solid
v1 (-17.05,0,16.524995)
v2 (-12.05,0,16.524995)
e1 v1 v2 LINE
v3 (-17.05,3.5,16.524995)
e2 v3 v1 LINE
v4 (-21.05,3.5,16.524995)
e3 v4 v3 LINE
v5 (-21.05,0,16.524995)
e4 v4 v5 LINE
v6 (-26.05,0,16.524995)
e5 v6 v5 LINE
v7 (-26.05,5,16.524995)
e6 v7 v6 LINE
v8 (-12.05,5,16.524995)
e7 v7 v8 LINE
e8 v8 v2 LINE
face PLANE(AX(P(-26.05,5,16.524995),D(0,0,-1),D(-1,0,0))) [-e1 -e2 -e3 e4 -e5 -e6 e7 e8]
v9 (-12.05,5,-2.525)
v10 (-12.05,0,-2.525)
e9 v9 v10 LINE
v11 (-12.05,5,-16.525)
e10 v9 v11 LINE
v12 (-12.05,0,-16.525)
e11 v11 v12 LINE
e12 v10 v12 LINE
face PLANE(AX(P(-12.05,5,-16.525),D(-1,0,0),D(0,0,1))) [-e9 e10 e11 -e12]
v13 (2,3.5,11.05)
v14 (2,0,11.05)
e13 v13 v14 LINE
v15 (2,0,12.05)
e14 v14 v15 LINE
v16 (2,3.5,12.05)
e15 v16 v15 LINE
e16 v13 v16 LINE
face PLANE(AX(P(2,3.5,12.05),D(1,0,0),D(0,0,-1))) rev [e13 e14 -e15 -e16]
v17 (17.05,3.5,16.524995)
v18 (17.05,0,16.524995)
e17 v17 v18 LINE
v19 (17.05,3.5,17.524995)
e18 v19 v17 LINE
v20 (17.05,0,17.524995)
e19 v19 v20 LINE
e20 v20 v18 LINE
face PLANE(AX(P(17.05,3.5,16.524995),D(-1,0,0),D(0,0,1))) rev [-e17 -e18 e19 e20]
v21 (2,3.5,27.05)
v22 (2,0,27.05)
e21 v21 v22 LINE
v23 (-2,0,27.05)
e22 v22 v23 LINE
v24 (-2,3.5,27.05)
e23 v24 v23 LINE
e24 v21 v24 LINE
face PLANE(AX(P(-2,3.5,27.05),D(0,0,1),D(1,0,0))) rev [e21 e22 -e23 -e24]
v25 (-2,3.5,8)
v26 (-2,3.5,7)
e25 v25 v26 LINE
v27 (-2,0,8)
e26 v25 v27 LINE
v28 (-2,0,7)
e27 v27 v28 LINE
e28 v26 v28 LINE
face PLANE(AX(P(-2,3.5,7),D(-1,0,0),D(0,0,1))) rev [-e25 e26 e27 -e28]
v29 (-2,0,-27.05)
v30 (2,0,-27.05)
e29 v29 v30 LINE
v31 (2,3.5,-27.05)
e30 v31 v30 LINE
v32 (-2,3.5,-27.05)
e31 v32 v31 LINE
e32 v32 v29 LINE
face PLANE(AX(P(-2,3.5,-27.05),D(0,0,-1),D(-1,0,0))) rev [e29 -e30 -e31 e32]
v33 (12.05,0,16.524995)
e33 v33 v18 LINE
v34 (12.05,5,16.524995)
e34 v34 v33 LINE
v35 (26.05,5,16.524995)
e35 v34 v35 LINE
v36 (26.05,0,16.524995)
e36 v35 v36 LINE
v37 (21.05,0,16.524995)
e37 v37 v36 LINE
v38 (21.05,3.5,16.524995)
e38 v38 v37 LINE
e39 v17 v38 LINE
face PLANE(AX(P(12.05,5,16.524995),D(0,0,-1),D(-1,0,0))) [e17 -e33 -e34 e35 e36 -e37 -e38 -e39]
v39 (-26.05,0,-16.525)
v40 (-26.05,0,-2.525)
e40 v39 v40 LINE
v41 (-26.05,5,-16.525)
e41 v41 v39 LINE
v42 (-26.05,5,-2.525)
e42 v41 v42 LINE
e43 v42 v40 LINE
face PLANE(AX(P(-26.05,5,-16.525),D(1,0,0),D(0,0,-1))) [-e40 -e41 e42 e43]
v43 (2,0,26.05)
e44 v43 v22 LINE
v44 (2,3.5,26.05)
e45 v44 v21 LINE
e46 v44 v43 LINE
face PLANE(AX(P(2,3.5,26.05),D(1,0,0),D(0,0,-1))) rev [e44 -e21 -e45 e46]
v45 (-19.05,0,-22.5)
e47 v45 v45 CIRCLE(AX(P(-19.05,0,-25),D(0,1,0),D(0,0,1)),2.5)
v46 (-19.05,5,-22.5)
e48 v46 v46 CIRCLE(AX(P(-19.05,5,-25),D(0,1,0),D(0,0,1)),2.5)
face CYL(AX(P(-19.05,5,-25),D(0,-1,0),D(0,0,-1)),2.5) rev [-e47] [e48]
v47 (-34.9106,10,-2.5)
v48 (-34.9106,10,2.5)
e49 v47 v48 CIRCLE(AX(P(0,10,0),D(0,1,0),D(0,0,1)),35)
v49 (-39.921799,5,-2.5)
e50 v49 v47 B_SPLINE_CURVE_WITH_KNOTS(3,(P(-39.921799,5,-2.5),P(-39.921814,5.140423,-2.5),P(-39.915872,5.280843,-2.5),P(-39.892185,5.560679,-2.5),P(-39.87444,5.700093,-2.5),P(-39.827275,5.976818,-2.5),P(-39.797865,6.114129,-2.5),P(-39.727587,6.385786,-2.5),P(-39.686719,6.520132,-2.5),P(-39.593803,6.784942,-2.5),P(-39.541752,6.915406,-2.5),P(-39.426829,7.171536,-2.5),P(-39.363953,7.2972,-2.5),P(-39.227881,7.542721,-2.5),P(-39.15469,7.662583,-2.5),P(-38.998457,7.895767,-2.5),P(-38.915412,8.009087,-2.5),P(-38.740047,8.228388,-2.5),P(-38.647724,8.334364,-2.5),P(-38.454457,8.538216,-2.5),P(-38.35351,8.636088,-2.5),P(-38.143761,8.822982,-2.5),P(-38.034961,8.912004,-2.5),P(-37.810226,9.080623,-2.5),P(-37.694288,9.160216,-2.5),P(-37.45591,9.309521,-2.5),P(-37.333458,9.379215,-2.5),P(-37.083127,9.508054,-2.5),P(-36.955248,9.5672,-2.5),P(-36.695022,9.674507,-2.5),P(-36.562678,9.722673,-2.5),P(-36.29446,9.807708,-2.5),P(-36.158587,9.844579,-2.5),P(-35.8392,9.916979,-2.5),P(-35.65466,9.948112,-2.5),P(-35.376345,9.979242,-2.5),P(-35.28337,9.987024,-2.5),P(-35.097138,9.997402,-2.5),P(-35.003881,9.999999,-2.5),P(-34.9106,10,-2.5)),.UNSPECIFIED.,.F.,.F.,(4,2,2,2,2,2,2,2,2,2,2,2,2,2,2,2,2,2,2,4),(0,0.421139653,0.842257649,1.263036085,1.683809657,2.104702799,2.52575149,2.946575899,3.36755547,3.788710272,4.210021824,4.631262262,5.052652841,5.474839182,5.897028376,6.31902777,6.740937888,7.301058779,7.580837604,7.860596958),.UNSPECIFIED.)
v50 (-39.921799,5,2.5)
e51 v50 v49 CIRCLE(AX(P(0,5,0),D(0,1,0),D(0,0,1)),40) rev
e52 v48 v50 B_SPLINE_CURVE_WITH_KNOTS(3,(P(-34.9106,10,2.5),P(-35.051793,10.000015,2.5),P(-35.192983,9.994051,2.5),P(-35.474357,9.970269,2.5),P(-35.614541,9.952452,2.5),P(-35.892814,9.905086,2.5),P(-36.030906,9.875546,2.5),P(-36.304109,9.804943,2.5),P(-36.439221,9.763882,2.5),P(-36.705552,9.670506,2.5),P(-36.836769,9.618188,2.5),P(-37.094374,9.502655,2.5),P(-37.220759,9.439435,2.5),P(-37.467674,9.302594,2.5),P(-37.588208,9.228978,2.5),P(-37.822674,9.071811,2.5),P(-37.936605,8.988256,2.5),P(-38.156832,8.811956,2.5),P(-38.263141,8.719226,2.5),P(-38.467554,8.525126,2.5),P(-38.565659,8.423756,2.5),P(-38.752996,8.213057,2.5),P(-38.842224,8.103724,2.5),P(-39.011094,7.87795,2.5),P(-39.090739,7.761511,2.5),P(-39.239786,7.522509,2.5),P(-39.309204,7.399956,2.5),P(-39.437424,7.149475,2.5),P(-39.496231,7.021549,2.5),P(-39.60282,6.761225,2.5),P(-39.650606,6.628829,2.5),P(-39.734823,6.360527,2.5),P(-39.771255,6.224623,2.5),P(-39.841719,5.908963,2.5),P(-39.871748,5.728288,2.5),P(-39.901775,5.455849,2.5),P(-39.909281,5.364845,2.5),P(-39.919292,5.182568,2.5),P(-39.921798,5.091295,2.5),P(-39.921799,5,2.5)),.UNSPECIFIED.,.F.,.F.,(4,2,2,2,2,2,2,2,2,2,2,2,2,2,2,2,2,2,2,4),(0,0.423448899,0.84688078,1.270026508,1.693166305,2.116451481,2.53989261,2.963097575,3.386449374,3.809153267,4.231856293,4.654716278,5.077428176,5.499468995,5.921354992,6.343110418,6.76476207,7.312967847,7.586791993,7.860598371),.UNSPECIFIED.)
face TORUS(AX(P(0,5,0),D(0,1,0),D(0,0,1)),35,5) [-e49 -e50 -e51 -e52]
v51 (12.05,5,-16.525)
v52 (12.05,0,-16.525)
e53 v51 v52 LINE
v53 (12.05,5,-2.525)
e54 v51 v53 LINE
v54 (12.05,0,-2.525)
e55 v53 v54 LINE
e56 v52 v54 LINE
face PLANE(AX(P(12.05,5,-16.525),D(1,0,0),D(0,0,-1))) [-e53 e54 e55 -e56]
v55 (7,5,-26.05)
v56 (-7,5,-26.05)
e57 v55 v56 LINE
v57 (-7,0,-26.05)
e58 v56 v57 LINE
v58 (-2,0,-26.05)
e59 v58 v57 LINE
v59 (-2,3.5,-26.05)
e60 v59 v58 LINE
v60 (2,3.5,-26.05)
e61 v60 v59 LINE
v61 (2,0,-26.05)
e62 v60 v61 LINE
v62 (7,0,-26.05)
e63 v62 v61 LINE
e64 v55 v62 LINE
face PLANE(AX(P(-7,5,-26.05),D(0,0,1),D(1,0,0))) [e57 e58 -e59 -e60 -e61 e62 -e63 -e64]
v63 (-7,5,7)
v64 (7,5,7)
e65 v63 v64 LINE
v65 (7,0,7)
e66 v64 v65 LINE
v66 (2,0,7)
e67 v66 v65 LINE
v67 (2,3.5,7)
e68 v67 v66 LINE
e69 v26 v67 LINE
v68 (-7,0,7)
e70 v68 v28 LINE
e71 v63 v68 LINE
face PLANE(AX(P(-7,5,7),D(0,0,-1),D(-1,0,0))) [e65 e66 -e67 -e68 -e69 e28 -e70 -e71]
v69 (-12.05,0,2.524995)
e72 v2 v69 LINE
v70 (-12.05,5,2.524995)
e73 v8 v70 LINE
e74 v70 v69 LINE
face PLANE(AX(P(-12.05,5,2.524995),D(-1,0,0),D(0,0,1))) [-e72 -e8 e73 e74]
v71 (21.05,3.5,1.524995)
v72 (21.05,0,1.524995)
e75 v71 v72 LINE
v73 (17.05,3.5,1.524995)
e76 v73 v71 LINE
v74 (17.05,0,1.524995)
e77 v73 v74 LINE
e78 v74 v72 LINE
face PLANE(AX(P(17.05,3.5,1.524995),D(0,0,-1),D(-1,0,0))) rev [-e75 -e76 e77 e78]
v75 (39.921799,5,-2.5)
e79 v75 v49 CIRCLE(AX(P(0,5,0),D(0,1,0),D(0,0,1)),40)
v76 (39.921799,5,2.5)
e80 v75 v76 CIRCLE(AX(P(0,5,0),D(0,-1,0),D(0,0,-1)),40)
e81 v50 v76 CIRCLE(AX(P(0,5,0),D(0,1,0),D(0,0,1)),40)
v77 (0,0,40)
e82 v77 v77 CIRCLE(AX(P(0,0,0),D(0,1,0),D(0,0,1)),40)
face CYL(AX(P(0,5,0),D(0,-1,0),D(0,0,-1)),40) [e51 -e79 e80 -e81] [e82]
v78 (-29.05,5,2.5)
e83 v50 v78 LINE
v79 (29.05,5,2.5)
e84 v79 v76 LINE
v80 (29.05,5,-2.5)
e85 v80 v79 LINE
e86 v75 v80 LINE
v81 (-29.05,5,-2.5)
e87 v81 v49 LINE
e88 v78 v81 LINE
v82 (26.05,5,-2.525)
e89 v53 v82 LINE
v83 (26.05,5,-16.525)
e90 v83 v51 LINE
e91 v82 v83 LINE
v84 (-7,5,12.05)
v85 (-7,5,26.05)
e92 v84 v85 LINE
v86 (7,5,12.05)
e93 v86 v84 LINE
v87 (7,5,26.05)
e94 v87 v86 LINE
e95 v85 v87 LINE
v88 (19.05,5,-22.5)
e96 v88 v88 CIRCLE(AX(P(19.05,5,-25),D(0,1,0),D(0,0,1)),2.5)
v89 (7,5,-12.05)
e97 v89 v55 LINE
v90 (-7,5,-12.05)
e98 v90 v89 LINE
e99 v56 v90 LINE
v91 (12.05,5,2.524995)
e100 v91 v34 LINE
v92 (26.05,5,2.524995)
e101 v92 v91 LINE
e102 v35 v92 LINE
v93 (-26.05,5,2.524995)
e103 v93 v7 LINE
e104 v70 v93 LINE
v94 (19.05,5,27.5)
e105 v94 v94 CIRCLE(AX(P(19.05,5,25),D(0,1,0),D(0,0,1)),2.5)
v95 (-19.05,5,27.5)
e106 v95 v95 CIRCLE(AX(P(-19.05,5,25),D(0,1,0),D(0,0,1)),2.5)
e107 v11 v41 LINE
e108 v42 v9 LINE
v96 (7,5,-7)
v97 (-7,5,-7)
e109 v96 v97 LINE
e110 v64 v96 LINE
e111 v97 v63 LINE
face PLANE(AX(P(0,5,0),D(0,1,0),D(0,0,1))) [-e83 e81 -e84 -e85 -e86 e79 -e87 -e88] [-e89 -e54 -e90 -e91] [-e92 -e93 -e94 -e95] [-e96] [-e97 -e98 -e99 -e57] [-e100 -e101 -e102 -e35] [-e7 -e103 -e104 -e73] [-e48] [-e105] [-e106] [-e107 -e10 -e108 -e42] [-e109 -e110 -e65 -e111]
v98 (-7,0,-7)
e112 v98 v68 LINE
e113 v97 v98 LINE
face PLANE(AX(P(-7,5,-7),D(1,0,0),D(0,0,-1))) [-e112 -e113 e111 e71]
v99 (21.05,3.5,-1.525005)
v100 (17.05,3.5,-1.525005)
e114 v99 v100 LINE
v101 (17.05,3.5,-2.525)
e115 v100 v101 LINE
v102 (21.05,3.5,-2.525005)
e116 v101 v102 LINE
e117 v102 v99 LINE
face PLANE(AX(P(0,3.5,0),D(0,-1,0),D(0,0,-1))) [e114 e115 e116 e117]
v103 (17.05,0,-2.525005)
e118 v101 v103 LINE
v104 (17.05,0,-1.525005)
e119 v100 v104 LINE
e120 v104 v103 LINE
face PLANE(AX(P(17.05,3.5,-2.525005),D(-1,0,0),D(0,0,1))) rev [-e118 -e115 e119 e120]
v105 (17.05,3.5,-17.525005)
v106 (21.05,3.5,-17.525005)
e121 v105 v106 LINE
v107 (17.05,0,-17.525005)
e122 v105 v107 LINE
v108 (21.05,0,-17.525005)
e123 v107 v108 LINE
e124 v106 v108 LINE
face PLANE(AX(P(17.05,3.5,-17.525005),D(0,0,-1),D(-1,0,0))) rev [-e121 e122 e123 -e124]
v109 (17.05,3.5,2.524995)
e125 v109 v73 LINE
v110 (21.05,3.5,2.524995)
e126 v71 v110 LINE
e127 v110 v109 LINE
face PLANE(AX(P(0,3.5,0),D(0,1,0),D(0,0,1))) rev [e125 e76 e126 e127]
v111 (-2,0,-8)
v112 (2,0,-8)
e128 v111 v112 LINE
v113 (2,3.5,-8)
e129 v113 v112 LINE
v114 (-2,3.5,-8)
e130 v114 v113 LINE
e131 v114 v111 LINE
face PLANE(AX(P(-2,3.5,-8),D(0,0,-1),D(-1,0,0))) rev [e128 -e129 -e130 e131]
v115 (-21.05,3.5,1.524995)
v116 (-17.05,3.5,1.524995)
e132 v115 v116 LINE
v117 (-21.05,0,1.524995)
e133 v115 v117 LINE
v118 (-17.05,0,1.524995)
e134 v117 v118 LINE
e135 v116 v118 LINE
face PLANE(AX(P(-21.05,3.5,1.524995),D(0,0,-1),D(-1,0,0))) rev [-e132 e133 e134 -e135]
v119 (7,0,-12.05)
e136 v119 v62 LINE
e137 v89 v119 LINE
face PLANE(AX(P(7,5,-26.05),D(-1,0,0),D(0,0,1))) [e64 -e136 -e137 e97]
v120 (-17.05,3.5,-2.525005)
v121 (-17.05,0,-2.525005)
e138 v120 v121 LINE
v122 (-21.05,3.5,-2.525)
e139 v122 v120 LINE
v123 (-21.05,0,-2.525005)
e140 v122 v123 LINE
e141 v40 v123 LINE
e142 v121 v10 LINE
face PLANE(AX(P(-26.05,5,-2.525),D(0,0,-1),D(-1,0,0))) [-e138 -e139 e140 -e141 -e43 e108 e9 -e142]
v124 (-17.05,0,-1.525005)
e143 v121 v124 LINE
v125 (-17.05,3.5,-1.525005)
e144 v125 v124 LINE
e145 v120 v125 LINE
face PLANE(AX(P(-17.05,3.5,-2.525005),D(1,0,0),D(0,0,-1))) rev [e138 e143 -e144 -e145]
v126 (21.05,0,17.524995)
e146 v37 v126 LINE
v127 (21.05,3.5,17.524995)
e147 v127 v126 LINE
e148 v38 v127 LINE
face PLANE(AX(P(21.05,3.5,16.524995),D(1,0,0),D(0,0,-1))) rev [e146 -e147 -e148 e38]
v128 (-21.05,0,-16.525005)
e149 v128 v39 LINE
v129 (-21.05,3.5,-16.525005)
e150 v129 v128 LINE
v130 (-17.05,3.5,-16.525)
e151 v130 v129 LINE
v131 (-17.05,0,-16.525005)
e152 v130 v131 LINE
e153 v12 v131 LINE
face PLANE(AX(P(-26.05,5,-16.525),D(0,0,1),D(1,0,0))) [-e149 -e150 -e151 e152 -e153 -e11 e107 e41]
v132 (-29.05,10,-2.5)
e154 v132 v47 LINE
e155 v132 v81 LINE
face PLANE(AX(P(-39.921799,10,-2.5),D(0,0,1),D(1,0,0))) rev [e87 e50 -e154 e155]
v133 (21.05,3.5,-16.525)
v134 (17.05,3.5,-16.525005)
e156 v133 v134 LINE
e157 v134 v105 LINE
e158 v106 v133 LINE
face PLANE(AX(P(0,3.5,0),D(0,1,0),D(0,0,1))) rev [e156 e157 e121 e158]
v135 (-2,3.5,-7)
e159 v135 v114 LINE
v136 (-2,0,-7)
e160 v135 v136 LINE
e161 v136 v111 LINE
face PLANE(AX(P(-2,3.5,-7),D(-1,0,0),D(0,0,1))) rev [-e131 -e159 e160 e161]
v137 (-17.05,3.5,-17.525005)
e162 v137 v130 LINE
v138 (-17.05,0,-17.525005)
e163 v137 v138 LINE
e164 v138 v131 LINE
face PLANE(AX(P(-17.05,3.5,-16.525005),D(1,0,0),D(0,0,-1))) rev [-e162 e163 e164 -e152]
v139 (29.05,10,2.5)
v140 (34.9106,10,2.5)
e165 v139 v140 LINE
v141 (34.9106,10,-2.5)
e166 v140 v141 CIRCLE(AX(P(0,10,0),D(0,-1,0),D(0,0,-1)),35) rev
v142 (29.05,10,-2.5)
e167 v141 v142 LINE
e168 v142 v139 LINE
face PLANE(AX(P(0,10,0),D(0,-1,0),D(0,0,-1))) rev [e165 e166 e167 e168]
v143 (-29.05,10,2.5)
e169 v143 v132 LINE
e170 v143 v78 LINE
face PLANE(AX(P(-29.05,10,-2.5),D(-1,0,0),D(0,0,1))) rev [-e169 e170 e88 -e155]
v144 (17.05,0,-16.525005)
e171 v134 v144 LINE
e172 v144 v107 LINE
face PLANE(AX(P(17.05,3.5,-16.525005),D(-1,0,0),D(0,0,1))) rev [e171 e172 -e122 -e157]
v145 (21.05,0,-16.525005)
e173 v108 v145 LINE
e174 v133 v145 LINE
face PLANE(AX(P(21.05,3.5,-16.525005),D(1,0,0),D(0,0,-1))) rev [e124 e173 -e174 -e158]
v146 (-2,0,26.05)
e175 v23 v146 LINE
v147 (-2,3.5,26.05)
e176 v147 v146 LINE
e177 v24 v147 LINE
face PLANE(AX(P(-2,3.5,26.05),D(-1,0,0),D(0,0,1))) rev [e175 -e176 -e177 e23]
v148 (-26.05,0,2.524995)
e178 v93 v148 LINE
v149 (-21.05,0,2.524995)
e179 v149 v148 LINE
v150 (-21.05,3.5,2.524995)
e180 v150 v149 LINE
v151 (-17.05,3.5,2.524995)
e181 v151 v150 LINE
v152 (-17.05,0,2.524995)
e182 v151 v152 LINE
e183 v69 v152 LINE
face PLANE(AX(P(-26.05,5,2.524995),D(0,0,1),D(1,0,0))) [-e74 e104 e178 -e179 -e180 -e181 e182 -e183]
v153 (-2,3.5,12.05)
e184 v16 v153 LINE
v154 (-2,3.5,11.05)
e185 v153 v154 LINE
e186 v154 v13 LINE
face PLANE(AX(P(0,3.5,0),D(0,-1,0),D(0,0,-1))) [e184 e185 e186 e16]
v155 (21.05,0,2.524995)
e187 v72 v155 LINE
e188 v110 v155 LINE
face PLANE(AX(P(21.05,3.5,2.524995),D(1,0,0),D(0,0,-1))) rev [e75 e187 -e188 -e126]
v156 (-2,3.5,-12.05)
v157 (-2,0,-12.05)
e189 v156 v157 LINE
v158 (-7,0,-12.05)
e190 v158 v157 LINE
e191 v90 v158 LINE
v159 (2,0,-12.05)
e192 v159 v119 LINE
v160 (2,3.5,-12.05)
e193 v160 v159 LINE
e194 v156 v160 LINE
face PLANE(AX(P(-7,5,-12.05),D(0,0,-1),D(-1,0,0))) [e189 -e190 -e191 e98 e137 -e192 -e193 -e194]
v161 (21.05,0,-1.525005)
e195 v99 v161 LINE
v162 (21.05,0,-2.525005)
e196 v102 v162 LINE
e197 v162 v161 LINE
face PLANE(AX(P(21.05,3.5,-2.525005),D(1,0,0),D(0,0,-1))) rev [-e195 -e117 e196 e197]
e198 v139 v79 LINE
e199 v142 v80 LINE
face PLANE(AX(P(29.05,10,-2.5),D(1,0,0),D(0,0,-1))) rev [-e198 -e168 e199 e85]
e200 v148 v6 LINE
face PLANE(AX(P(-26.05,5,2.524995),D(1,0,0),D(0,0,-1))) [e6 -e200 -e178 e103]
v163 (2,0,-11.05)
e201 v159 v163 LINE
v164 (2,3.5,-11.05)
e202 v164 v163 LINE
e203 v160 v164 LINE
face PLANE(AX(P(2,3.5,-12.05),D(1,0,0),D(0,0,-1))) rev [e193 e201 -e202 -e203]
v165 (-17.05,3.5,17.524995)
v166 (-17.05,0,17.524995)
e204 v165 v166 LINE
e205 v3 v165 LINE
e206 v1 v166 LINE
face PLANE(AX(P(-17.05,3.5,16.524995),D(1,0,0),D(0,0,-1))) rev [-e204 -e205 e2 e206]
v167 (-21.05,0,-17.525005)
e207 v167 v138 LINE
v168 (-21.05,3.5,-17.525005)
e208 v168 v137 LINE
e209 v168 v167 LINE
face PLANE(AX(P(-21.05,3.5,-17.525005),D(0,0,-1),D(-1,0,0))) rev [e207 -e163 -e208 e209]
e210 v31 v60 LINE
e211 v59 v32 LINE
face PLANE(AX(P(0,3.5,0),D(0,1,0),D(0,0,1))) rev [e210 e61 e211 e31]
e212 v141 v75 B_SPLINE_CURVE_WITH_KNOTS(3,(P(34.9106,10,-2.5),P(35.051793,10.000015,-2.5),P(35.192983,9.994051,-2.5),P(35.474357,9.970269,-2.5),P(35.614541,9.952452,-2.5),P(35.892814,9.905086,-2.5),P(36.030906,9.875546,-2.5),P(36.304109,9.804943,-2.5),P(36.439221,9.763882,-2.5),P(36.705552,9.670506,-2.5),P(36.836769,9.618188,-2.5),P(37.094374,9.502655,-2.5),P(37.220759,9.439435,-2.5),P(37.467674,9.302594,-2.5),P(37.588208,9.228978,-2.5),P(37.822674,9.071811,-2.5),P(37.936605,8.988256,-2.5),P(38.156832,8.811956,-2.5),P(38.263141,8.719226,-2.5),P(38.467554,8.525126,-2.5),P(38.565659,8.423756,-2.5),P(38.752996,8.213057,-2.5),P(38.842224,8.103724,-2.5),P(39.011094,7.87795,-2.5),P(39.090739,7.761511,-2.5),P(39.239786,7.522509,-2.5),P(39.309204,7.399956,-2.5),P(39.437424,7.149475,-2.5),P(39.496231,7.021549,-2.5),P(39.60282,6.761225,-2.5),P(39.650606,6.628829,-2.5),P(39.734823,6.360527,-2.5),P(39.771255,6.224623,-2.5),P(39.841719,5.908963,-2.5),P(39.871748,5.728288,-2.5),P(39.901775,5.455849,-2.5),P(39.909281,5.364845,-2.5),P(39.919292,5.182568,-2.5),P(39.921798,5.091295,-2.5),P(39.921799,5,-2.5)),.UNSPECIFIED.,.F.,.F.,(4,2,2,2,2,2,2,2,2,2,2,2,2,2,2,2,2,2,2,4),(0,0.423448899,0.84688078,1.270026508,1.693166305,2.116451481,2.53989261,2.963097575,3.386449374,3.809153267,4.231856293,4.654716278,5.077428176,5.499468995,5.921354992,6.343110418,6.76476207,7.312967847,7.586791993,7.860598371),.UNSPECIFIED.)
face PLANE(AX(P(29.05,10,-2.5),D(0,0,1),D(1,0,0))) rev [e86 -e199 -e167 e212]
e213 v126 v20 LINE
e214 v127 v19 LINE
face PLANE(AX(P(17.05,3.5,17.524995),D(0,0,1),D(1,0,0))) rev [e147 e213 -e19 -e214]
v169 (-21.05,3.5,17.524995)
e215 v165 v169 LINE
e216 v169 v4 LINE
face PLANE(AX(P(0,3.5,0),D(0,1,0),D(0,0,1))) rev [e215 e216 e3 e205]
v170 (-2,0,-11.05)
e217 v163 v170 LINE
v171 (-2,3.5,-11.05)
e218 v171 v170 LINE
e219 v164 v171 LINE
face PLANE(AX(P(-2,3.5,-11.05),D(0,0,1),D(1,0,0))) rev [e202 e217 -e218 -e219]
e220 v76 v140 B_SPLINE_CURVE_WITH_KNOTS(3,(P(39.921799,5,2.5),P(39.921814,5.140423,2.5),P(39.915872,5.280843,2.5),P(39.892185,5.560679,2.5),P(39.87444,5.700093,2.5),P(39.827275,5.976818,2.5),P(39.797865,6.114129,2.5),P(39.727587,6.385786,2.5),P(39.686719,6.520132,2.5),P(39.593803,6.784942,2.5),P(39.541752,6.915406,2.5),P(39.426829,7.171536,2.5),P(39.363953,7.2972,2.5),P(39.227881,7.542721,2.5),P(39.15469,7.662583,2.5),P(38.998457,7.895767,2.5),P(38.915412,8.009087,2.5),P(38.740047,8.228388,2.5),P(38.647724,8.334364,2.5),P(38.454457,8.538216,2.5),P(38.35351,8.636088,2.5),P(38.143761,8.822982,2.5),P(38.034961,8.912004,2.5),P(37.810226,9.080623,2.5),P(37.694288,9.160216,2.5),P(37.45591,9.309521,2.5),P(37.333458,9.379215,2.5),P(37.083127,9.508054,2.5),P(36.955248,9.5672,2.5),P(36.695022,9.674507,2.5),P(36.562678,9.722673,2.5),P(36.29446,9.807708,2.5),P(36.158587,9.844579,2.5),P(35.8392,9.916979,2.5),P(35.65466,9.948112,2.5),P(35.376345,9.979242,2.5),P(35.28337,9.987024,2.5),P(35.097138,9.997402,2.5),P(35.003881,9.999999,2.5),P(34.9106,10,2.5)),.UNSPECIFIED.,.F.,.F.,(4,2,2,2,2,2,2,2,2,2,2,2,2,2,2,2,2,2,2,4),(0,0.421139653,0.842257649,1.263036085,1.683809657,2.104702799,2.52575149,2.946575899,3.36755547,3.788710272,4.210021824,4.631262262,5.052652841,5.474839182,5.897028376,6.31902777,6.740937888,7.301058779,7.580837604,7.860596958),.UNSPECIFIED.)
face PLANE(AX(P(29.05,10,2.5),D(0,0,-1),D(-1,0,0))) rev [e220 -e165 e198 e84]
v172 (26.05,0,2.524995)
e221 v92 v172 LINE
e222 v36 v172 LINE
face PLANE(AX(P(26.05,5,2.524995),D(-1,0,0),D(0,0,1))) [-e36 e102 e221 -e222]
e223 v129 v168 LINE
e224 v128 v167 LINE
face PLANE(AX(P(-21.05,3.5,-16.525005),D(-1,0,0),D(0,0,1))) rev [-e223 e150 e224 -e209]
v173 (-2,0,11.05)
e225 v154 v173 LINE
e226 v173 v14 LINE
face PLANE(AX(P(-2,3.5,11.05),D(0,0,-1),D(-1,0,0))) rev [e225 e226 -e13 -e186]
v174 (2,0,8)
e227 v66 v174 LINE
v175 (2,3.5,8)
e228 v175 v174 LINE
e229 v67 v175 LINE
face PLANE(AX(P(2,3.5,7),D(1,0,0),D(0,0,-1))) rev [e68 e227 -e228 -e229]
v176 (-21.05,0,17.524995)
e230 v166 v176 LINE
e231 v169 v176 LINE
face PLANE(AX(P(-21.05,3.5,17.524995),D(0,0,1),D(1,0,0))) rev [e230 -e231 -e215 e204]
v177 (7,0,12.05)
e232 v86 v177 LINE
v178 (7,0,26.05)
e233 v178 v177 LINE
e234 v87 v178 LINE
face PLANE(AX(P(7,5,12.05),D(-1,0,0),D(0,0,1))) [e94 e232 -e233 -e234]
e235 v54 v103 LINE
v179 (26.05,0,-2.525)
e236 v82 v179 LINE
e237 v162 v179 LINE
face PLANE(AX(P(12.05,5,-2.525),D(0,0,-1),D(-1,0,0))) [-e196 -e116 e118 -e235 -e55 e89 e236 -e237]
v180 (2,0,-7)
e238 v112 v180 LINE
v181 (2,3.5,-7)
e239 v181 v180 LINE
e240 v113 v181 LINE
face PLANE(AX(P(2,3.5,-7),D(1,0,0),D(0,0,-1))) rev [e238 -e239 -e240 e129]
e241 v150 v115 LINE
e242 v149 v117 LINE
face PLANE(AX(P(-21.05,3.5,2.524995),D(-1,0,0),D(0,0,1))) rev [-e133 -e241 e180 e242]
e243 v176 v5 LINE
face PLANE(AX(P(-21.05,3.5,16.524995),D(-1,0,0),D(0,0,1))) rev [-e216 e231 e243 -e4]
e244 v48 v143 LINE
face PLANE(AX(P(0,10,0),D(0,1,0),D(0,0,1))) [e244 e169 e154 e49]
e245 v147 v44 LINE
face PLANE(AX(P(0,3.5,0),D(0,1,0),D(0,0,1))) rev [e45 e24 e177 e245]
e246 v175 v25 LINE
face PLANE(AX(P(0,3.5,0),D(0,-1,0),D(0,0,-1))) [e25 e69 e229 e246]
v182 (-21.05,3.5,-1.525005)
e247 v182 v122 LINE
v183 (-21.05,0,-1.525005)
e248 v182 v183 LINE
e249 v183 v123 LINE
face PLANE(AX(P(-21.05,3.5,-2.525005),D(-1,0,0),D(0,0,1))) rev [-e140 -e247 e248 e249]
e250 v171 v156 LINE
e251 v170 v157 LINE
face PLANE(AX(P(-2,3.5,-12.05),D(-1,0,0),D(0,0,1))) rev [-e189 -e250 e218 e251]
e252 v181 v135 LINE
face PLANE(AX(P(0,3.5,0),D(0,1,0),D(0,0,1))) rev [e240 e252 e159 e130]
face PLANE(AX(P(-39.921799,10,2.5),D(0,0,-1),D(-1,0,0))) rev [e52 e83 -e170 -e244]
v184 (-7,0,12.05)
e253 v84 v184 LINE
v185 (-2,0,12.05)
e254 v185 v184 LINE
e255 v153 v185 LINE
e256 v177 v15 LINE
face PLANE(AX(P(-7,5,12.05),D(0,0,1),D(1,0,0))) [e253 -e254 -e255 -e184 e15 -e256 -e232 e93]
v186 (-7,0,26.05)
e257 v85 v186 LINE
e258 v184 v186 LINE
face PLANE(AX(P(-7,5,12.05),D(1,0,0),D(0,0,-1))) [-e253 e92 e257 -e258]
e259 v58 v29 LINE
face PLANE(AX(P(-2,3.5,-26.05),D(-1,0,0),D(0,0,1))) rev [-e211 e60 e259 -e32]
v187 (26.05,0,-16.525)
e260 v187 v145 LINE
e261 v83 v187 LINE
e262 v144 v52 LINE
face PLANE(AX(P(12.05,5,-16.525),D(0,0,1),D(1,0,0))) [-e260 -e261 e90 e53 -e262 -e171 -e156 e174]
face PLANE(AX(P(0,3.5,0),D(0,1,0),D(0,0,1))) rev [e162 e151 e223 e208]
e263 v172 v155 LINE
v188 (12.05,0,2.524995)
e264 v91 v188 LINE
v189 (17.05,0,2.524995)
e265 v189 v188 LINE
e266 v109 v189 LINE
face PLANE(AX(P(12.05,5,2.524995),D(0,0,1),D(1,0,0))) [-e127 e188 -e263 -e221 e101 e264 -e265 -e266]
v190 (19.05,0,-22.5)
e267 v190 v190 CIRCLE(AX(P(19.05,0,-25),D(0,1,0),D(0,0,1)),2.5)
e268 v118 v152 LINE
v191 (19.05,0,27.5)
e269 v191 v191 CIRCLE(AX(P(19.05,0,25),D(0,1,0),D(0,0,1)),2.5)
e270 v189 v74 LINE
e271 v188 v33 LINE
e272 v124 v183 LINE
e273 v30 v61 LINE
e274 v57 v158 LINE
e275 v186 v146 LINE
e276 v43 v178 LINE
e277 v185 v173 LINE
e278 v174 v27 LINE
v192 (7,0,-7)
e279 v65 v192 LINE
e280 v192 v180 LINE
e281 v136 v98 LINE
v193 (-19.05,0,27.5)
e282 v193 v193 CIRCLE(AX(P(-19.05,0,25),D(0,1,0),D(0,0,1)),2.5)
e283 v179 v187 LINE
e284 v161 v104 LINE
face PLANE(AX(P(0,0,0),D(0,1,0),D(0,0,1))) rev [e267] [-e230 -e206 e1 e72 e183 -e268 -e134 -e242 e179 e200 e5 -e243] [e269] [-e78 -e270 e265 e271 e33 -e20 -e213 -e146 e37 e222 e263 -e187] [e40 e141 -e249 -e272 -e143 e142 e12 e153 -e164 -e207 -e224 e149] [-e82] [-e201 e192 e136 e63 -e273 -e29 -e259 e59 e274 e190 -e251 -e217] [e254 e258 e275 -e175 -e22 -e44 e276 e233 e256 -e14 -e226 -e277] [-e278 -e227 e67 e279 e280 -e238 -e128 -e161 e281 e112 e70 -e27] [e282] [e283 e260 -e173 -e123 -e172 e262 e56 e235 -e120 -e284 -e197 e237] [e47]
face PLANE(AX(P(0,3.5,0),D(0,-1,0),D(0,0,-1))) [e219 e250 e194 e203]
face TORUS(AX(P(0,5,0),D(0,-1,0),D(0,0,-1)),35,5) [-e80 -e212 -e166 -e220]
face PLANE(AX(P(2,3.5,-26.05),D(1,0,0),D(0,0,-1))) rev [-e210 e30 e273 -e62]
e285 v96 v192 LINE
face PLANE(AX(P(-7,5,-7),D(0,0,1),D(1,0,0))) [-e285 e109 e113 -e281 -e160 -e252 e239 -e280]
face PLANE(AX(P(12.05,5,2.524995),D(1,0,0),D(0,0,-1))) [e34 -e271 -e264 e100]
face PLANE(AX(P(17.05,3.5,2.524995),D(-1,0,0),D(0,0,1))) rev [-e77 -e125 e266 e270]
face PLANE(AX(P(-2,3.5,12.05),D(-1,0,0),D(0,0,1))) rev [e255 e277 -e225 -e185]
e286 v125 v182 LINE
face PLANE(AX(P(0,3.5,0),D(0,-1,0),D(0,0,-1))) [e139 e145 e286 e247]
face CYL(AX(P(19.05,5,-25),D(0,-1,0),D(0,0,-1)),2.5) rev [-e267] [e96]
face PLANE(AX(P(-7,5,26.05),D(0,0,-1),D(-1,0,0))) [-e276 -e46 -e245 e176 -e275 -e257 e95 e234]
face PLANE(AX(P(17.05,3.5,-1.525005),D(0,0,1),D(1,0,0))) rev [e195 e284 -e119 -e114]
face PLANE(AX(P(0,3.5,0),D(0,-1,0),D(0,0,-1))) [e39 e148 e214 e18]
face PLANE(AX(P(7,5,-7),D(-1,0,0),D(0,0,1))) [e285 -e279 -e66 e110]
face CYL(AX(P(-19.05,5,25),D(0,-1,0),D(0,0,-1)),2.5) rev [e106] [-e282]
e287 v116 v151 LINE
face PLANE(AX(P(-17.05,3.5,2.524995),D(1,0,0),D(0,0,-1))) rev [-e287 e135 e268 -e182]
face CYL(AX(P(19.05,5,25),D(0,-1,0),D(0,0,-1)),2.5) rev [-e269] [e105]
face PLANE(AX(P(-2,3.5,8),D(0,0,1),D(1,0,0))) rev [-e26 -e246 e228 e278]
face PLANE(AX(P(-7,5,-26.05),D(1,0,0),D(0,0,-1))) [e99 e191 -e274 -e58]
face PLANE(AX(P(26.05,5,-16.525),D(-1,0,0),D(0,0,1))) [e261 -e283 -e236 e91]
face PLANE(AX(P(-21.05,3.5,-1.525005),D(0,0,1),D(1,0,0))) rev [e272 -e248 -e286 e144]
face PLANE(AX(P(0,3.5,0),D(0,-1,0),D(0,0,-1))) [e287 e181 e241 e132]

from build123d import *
from OCP.BRepAlgoAPI import BRepAlgoAPI_Cut
from OCP.TopTools import TopTools_ListOfShape

# Parameters (mm, degrees)
SKETCH1_R           = 40
SKETCH1_R_2         = 2.5
SKETCH1_W           = 14
SKETCH1_H           = 14
BOSS_EXTRUDE1_DEPTH = 5
BOSS_EXTRUDE2_DEPTH = 5
FILLET1_R           = 5
SKETCH3_W           = 4
SKETCH3_H           = 1
CUT_EXTRUDE1_DEPTH  = 3.5


with BuildPart() as part:
    # Sketch1 → Boss-Extrude1 (new body)
    with BuildSketch(Plane(origin=(0, 0, 0), x_dir=(1, 0, 0), z_dir=(0, 1, 0))):
        with Locations(Location((0, 0, 0), (0, 0, 270))):
            Circle(SKETCH1_R)
        with Locations(Location((-19.05, 25, 0), (0, 0, 270))):
            Circle(SKETCH1_R_2, mode=Mode.SUBTRACT)
        with Locations(Location((19.05, 25, 0), (0, 0, 270))):
            Circle(SKETCH1_R_2, mode=Mode.SUBTRACT)
        with Locations(Location((19.05, -25, 0), (0, 0, 270))):
            Circle(SKETCH1_R_2, mode=Mode.SUBTRACT)
        with Locations(Location((-19.05, -25, 0), (0, 0, 270))):
            Circle(SKETCH1_R_2, mode=Mode.SUBTRACT)
        with Locations((0, 19.05)):
            Rectangle(SKETCH1_W, SKETCH1_H, mode=Mode.SUBTRACT)
        Rectangle(SKETCH1_W, SKETCH1_H, mode=Mode.SUBTRACT)
        with Locations((0, -19.05)):
            Rectangle(SKETCH1_W, SKETCH1_H, mode=Mode.SUBTRACT)
        with Locations((-19.05, 9.525)):
            Rectangle(SKETCH1_W, SKETCH1_H, mode=Mode.SUBTRACT)
        with Locations((19.05, 9.525)):
            Rectangle(SKETCH1_W, SKETCH1_H, mode=Mode.SUBTRACT)
        with Locations((-19.04999963, -9.524995038)):
            Rectangle(SKETCH1_W, SKETCH1_H, mode=Mode.SUBTRACT)
        with Locations((19.05000037, -9.524995038)):
            Rectangle(SKETCH1_W, SKETCH1_H, mode=Mode.SUBTRACT)
    extrude(amount=BOSS_EXTRUDE1_DEPTH)

    # Sketch2 → Boss-Extrude2 (add)
    with BuildSketch(Plane(origin=(0, 5, 0), x_dir=(1, 0, 0), z_dir=(0, 1, 0))):
        with BuildLine():
            Line((-39.921798557, 2.5), (-29.05, 2.5))
            Line((-29.05, 2.5), (-29.05, -2.5))
            Line((-29.05, -2.5), (-39.921798557, -2.5))
            ThreePointArc((-39.921798557, -2.5), (-40, 0), (-39.921798557, 2.5))
        make_face()
        with BuildLine():
            Line((29.05, 2.5), (29.05, -2.5))
            Line((29.05, -2.5), (39.921798557, -2.5))
            ThreePointArc((39.921798557, -2.5), (40, 0), (39.921798557, 2.5))
            Line((39.921798557, 2.5), (29.05, 2.5))
        make_face()
    extrude(amount=BOSS_EXTRUDE2_DEPTH)

    # Fillet1
    fillet1_edges = [part.edges().sort_by_distance(p)[0] for p in [
        (40, 10, 0),
        (-40, 10, 0),
    ]]
    fillet(fillet1_edges, radius=FILLET1_R - 0.0001)  # a hair under: the kernel refuses the full size


with BuildPart() as cut_extrude1_tool:
    # Sketch3 → Cut-Extrude1 (new body)
    with BuildSketch(Plane.XZ):
        with Locations((0, 26.55)):
            Rectangle(SKETCH3_W, SKETCH3_H)
        with Locations((0, 11.55)):
            Rectangle(SKETCH3_W, SKETCH3_H)
        with Locations((0, 7.5)):
            Rectangle(SKETCH3_W, SKETCH3_H)
        with Locations((0, -7.5)):
            Rectangle(SKETCH3_W, SKETCH3_H)
        with Locations((0, -11.55)):
            Rectangle(SKETCH3_W, SKETCH3_H)
        with Locations((0, -26.55)):
            Rectangle(SKETCH3_W, SKETCH3_H)
        with Locations((-19.04999963, 17.024995038)):
            Rectangle(SKETCH3_W, SKETCH3_H)
        with Locations((-19.04999963, 2.024995038)):
            Rectangle(SKETCH3_W, SKETCH3_H)
        with Locations((19.05000037, 2.024995038)):
            Rectangle(SKETCH3_W, SKETCH3_H)
        with Locations((19.05000037, 17.024995038)):
            Rectangle(SKETCH3_W, SKETCH3_H)
        with Locations((19.05000037, -17.025004962)):
            Rectangle(SKETCH3_W, SKETCH3_H)
        with Locations((19.05000037, -2.025004962)):
            Rectangle(SKETCH3_W, SKETCH3_H)
        with Locations((-19.04999963, -17.025004962)):
            Rectangle(SKETCH3_W, SKETCH3_H)
        with Locations((-19.04999963, -2.025004962)):
            Rectangle(SKETCH3_W, SKETCH3_H)
    extrude(amount=-CUT_EXTRUDE1_DEPTH)


with BuildPart() as part_1:
    add(part.part)

    # Cut-Extrude1: cut by cut_extrude1_tool, with a tolerance
    cut_extrude1_stock = TopTools_ListOfShape()
    cut_extrude1_stock.Append(part_1.part.wrapped)
    cut_extrude1_tools = TopTools_ListOfShape()
    cut_extrude1_tools.Append(cut_extrude1_tool.part.wrapped)
    cut_extrude1_cut = BRepAlgoAPI_Cut()
    cut_extrude1_cut.SetArguments(cut_extrude1_stock)
    cut_extrude1_cut.SetTools(cut_extrude1_tools)
    cut_extrude1_cut.SetFuzzyValue(0.00001)
    cut_extrude1_cut.Build()
    add(Compound.cast(cut_extrude1_cut.Shape()).solids(), mode=Mode.REPLACE)


solid = part_1.part
